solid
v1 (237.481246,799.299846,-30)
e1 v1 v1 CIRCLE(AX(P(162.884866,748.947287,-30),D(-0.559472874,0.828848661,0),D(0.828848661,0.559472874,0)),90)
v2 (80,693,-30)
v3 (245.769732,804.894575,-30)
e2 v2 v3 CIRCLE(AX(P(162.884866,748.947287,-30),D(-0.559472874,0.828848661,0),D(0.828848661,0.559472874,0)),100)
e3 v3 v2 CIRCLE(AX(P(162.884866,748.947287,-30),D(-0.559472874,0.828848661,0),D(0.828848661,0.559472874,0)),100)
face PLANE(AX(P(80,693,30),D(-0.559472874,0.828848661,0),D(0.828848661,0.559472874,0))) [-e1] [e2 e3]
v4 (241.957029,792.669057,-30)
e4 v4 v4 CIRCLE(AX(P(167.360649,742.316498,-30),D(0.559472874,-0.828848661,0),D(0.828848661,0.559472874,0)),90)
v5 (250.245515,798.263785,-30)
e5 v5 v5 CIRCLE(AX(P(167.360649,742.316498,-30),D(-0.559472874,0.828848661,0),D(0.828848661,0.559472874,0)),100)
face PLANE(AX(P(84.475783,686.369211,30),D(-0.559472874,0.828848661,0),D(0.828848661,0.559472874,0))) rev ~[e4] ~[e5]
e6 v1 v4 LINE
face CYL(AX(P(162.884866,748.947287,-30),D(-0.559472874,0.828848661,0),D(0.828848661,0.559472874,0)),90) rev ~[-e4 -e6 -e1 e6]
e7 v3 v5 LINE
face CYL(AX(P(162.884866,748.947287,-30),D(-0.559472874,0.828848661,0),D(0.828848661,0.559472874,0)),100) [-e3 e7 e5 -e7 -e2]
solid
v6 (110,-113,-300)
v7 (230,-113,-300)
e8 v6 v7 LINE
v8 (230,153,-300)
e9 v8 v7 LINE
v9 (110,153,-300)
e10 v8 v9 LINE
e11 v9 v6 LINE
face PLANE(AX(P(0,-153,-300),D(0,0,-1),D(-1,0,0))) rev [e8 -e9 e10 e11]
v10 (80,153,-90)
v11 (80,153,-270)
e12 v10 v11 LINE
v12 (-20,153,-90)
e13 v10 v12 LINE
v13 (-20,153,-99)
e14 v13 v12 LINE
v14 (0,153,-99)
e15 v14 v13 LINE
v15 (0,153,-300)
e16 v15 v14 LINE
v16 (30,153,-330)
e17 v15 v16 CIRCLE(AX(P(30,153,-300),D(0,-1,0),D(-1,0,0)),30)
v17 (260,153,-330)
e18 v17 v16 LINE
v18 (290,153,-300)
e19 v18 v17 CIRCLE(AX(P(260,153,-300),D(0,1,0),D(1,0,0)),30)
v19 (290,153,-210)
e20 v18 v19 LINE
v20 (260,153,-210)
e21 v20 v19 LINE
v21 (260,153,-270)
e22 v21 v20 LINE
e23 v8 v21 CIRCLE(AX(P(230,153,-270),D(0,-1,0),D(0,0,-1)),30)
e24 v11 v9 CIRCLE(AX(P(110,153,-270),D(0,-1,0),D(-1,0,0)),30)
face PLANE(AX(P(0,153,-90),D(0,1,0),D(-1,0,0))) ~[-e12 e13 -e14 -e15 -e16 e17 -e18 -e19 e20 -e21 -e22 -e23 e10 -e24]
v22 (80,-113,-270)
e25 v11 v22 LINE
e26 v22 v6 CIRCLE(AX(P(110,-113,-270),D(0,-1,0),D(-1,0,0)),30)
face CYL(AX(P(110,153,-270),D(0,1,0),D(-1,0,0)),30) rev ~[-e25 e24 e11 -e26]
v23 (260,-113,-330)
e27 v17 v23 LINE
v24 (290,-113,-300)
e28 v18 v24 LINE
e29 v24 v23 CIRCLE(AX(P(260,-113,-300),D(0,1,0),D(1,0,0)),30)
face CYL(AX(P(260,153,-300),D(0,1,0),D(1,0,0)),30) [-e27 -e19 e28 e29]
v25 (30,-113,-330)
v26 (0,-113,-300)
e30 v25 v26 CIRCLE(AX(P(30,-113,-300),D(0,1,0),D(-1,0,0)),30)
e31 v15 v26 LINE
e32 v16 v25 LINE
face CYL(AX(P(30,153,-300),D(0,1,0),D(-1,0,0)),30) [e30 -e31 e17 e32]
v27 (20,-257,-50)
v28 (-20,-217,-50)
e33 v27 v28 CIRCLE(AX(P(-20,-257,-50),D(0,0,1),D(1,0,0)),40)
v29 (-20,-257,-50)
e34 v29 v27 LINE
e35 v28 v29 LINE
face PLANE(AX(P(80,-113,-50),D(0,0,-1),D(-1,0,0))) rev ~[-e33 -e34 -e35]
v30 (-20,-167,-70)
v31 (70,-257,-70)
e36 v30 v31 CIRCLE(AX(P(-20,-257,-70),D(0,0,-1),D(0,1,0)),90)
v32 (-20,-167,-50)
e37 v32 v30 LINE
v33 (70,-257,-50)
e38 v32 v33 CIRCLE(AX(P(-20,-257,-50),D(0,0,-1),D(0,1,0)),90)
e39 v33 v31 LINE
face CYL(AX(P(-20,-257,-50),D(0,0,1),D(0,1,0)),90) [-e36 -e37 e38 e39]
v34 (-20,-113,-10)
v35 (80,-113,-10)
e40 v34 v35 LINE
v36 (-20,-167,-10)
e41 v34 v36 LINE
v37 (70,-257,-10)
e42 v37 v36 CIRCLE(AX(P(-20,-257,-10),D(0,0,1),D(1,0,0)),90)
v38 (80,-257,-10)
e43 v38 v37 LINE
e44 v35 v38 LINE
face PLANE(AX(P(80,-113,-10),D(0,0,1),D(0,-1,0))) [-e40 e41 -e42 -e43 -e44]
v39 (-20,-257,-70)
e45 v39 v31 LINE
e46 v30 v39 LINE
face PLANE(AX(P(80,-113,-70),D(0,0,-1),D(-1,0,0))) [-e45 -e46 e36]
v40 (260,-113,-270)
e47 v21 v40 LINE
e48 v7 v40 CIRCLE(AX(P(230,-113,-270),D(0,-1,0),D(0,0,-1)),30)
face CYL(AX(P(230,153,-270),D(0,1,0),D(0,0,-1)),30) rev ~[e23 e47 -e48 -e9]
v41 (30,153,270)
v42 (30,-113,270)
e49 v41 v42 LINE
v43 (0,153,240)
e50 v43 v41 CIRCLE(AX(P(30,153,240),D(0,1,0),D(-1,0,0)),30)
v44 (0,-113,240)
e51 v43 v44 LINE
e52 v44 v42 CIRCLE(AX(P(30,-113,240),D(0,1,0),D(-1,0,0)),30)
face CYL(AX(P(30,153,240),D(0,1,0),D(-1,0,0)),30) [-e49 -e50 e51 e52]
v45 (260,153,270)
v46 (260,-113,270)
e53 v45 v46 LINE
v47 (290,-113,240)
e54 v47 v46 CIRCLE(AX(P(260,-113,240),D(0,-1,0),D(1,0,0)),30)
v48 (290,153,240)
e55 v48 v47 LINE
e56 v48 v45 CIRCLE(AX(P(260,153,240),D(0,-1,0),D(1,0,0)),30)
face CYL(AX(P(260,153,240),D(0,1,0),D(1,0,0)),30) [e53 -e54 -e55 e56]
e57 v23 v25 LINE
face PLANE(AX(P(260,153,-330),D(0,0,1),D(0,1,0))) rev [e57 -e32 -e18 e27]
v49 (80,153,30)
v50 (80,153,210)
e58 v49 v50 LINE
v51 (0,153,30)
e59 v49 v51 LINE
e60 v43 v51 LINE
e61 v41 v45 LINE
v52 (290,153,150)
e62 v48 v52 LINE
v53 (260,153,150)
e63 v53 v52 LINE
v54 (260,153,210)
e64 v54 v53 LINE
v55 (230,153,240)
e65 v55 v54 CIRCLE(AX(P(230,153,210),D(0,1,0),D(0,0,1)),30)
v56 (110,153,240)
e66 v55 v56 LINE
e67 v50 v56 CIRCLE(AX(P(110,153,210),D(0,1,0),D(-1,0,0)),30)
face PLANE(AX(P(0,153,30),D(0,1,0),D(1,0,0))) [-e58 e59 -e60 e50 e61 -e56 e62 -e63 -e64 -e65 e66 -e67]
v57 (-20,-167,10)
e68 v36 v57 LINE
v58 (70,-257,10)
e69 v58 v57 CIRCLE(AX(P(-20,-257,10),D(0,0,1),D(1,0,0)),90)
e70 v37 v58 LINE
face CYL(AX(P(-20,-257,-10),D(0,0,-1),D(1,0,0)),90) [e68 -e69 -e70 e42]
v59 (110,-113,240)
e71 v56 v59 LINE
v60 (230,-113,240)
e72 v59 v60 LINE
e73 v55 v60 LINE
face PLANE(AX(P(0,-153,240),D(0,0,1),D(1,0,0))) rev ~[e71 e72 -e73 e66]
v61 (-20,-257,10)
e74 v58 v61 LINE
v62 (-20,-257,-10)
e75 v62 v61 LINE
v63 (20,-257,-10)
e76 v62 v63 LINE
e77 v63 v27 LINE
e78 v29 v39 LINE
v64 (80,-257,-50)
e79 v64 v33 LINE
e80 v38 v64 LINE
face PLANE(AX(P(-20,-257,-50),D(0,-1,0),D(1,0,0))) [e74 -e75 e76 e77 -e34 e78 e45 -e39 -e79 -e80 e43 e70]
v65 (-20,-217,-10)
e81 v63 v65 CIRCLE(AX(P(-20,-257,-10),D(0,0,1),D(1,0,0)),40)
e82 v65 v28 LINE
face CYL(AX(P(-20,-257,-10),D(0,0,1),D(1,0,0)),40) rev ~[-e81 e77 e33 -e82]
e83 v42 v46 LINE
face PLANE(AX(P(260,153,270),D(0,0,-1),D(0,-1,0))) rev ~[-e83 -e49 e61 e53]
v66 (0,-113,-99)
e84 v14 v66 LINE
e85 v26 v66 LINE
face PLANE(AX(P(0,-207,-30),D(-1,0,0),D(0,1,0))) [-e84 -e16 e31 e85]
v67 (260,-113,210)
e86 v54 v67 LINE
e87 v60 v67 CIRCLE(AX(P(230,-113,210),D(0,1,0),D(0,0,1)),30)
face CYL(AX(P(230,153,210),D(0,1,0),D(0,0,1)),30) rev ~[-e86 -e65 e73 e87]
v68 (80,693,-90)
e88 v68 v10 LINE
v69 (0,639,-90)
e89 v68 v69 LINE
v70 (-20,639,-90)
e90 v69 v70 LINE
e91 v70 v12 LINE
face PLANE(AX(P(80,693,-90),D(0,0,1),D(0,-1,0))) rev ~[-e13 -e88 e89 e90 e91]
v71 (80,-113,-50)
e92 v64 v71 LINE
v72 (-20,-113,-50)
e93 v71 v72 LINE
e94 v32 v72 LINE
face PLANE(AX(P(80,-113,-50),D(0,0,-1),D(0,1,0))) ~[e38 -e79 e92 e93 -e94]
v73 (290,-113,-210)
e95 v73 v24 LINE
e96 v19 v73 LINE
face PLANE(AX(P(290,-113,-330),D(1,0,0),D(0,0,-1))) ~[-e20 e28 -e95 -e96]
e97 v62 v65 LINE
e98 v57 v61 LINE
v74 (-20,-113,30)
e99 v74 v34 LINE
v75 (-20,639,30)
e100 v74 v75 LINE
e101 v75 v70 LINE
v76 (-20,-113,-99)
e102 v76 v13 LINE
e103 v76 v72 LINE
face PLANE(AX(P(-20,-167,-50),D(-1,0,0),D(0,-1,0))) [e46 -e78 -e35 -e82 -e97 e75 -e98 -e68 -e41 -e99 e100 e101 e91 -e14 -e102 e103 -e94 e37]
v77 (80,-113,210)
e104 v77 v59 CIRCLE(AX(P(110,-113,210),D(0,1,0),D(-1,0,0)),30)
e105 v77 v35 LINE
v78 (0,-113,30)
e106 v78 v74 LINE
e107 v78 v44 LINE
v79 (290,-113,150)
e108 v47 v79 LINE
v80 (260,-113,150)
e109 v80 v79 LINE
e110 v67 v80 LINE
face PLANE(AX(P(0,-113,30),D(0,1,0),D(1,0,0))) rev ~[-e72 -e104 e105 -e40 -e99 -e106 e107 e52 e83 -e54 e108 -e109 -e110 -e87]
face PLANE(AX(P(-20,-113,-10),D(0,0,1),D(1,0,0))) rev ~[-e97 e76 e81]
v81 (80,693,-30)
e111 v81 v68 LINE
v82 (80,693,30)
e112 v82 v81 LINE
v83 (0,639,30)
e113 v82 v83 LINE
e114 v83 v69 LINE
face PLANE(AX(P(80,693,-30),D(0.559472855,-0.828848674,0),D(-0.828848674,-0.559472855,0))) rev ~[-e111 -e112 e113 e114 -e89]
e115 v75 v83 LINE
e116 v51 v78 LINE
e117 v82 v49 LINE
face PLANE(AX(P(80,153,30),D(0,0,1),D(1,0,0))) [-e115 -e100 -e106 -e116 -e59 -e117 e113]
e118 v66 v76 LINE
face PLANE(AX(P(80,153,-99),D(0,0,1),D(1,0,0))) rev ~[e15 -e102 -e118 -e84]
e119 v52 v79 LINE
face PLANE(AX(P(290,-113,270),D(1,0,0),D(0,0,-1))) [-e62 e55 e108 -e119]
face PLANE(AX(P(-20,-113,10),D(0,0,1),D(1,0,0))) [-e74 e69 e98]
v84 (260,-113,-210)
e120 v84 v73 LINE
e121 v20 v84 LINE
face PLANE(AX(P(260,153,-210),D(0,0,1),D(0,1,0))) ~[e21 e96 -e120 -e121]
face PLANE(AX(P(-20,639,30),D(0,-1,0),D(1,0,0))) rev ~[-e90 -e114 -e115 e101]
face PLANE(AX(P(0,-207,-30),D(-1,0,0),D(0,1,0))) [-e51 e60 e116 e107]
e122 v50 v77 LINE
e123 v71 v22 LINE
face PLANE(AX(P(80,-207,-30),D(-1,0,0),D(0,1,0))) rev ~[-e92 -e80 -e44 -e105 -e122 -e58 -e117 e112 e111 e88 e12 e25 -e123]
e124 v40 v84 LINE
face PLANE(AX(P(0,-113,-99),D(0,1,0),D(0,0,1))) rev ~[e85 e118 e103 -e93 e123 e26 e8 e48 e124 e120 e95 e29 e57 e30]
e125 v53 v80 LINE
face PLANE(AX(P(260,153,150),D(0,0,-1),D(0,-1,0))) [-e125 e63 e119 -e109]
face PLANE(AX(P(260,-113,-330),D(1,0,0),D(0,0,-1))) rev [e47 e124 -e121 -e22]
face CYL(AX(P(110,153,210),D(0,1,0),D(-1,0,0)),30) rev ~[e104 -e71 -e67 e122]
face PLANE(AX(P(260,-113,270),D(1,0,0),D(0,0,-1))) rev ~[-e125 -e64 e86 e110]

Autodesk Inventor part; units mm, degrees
ref_plane "YZ Plane" through (0, 0, 0) normal (1, 0, 0) x (0, 1, 0)
ref_plane "XZ Plane" through (0, 0, 0) normal (0, 1, 0) x (-1, 0, 0)
ref_plane "XY Plane" through (0, 0, 0) normal (0, 0, 1) x (1, 0, 0)
sketch "Sketch1" plane through (0, 0, 0) normal (0, 0, 1) x (1, 0, 0)
  line L0 (0, -27) -> (0, 396)
  line L1 (0, -27) -> (40, -27)
  line L2 (40, -27) -> (40, 423)
  line L3 (40, 423) -> (0, 396)
  point P0 (0, 0)
  dimension "d0" = 423
  dimension "d1" = 27
  dimension "d2" = 40
  dimension "d3" = 450
extrude "Extrusion1" add sketch "Sketch1" along normal mid plane 300
sketch "Sketch2" plane through (40, -27, 150) normal (1, 0, 0) x (0, 0, -1)
  line L0 (0, 450) -> (300, 450) construction
  line L1 (150, 450) -> (150, 0) construction
  line L2 (300, 0) -> (0, 0) construction
  line L3 (120, 450) -> (120, 180)
  line L4 (120, 180) -> (0, 180)
  line L5 (0, 180) -> (0, 450)
  line L6 (0, 423) -> (0, 0) projected
  line L7 (300, 450) -> (0, 450) construction
  line L8 (180, 450) -> (180, 180)
  line L9 (180, 180) -> (300, 180)
  line L10 (300, 180) -> (300, 450)
  line L11 (0, 0) -> (0, 450) projected
  line L12 (0, 450) -> (120, 450)
  line L13 (180, 450) -> (300, 450)
  point P0 (150, 27)
  dimension "d6" = 270
extrude "Extrusion2" cut sketch "Sketch2" against normal blind 263.525
sketch "Sketch3" plane through (0, 0, 150) normal (0, 0, 1) x (1, 0, 0)
  line L0 (40, -27) -> (0, -27) projected
  arc A0 (27, -27) -> (0, 0) centre (0, -27) ccw
  line L1 (0, -27) -> (0, 153) projected
  line L2 (0, 0) -> (0, -27)
  line L3 (0, -27) -> (27, -27)
  dimension "d9" = 27
extrude "Extrusion3" cut sketch "Sketch3" against normal blind 400
sketch "Sketch4" plane through (40, -27, 150) normal (1, 0, 0) x (0, 0, -1)
  line L0 (0, 0) -> (300, 0) projected
  line L1 (0, 0) -> (120, 0)
  line L2 (120, 0) -> (120, 27)
  line L3 (300, 27) -> (0, 27) projected
  line L4 (120, 27) -> (0, 27)
  line L5 (0, 0) -> (0, 180) projected
  line L6 (0, 27) -> (0, 0)
  point P0 (150, 27)
  dimension "d12" = 120
  dimension "d13" = 27
extrude "Extrusion4" cut sketch "Sketch4" against normal blind 400
mirror "Mirror1" about plane through (0, 0, 0) normal (0, 0, 1) of "Extrusion4"
sketch "Sketch5" plane through (40, 153, 150) normal (0, 1, 0) x (1, 0, 0)
  point P0 (-40, 150)
sketch "Sketch6" plane through (40, 423, 30) normal (-0.5594729, 0.8288487, 0) x (0.8288487, 0.5594729, 0)
  line L0 (0, 0) -> (0, 60) projected
  line L1 (0, 30) -> (50, 30)
  circle A0 centre (50, 30) radius 50
  circle A1 centre (50, 30) radius 45
  point P0 (-269.811, 30)
  dimension "d16" = 50
  dimension "d17" = 90
extrude "Extrusion5" add sketch "Sketch6" against normal blind 4
sketch "Sketch7" plane through (40, 153, -30) normal (1, 0, 0) x (0, 0, -1)
  line L0 (-60, -153) -> (-60, -180) projected
  line L1 (-60, -153) -> (-60, -133)
  line L2 (-60, -133) -> (-180, -133)
  line L3 (-180, -153) -> (-180, 0) projected
  line L4 (-180, -153) -> (-60, -153) projected
  line L5 (-180, -153) -> (-60, -153)
  point P0 (-30, -153)
  dimension "d20" = 20
extrude "Extrusion6" cut sketch "Sketch7" against normal blind 300
mirror "Mirror2" about plane through (0, 0, 0) normal (0, 0, 1) of "Extrusion6"
sketch "Sketch8" plane through (0, 0, 150) normal (0, 0, 1) x (1, 0, 0)
  point P0 (0, 0)
sketch "Sketch9" plane through (0, 0, 150) normal (0, 0, 1) x (1, 0, 0)
  point P0 (0, 0)
sketch "Sketch10" plane through (0, 0, 150) normal (0, 0, 1) x (1, 0, 0)
  point P0 (0, 0)
sketch "Sketch11" plane through (0, 0, 150) normal (0, 0, 1) x (1, 0, 0)
  line L0 (40, 153) -> (0, 153) projected
  line L1 (40, 20) -> (40, -27) projected
  line L2 (40, 153) -> (40, 20)
  line L3 (40, 20) -> (130, 20)
  line L4 (130, 20) -> (130, 153)
  line L5 (130, 153) -> (40, 153)
  point P0 (0, 0)
  dimension "d23" = 90
extrude "Extrusion7" add sketch "Sketch11" against normal blind 15
mirror "Mirror3" about plane through (0, 0, 0) normal (0, 0, 1) of "Extrusion7"
sketch "Sketch12" plane through (130, 20, 150) normal (1, 0, 0) x (0, 0, -1)
  line L0 (0, 133) -> (0, 0) projected
  line L1 (0, 133) -> (60, 133)
  line L2 (0, 133) -> (120, 133) projected
  line L3 (60, 133) -> (60, 0)
  line L4 (15, 0) -> (120, 0) projected
  line L5 (60, 0) -> (0, 0)
  line L6 (0, 0) -> (0, 133)
  point P0 (150, -20)
extrude "Extrusion8" add sketch "Sketch12" along normal blind 15
mirror "Mirror4" about plane through (0, 0, 0) normal (0, 0, 1) of "Extrusion8"
sketch "Sketch13" plane through (40, 153, -30) normal (1, 0, 0) x (0, 0, -1)
  line L0 (-60, -153) -> (-60, -133) projected
  line L1 (-60, -133) -> (-40, -133)
  line L2 (-40, -133) -> (-40, -180)
  line L3 (-60, -180) -> (0, -180) projected
  line L4 (-40, -180) -> (-60, -180)
  line L5 (-60, -180) -> (-60, -133)
  point P0 (-30, -153)
  dimension "d28" = 20
extrude "Extrusion9" cut sketch "Sketch13" against normal blind 200
mirror "Mirror5" about plane through (0, 0, 0) normal (0, 0, 1) of "Extrusion9"
sketch "Sketch14" plane through (0, 153, 30) normal (0, 1, 0) x (1, 0, 0)
  line L0 (0, -120) -> (0, 0) projected
  line L1 (0, 0) -> (0, -105)
  line L2 (145, -120) -> (0, -120) projected
  line L3 (15, -120) -> (145, -120)
  arc A0 (0, -105) -> (15, -120) centre (15, -105) ccw
  line L4 (0, 0) -> (0, -120)
  line L5 (0, -120) -> (145, -120)
  arc A1 (0, -105) -> (15, -120) centre (15, -105) ccw
  line L6 (0, -105) -> (0, -120)
  line L7 (0, -120) -> (15, -120)
  arc A2 (0, -105) -> (15, -120) centre (15, -105) ccw
  point P0 (0, 30)
  dimension "d31" = 15
extrude "Extrusion10" cut sketch "Sketch14" against normal blind 200
sketch "Sketch15" plane through (0, 153, 30) normal (0, 1, 0) x (1, 0, 0)
  line L0 (40, 0) -> (40, -105) projected
  line L1 (40, 0) -> (40, -90)
  line L2 (40, -105) -> (130, -105) projected
  line L3 (55, -105) -> (130, -105)
  arc A0 (40, -90) -> (55, -105) centre (55, -90) ccw
  arc A1 (40, -90) -> (55, -105) centre (55, -90) ccw
  line L4 (40, -90) -> (40, -105)
  line L5 (40, -105) -> (55, -105)
  point P0 (0, 30)
  dimension "d34" = 15
sketch "Sketch16" plane through (0, 0, 150) normal (0, 0, 1) x (1, 0, 0)
  point P0 (0, 0)
extrude "Extrusion11" add sketch "Sketch15" against normal blind 133
mirror "Mirror6" about plane through (0, 0, 0) normal (0, 0, 1) of "Extrusion11", "Extrusion10"
sketch "Sketch17" plane through (0, 153, 30) normal (0, 1, 0) x (1, 0, 0)
  line L0 (130, -60) -> (130, -105) projected
  line L1 (130, -60) -> (130, -90)
  line L2 (55, -105) -> (130, -105) projected
  line L3 (115, -105) -> (55, -105)
  arc A0 (115, -105) -> (130, -90) centre (115, -90) ccw
  arc A1 (115, -105) -> (130, -90) centre (115, -90) ccw
  line L4 (130, -90) -> (130, -105)
  line L5 (130, -105) -> (115, -105)
  point P0 (0, 30)
  dimension "d37" = 15
extrude "Extrusion12" add sketch "Sketch17" against normal blind 133
mirror "Mirror7" about plane through (0, 0, 0) normal (0, 0, 1) of "Extrusion12"
sketch "Sketch18" plane through (0, 153, -30) normal (0, 1, 0) x (1, 0, 0)
  line L0 (15, 120) -> (145, 120) projected
  line L1 (15, 120) -> (130, 120)
  line L2 (145, 120) -> (145, 60) projected
  line L3 (145, 105) -> (145, 60)
  arc A0 (145, 105) -> (130, 120) centre (130, 105) ccw
  arc A1 (145, 105) -> (130, 120) centre (130, 105) ccw
  line L4 (130, 120) -> (145, 120)
  line L5 (145, 120) -> (145, 105)
  point P0 (0, -30)
  dimension "d40" = 15
extrude "Extrusion13" cut sketch "Sketch18" against normal blind 133
mirror "Mirror8" about plane through (0, 0, 0) normal (0, 0, 1) of "Extrusion13"
scale "Scale1" factors (2, 2, 2) then translate (0, -153, -30) bodies 1
sketch "Sketch19" plane through (80, 153, 30) normal (0, 0, 1) x (1, 0, 0)
  point P0 (-80, -153)
sketch "Sketch20" plane through (80, -207, -10) normal (0, 0, 1) x (1, 0, 0)
  point P0 (-80, 207)
sketch "Sketch21" plane through (80, -207, -10) normal (0, 0, 1) x (1, 0, 0)
  point P0 (-80, 207)
sketch "Sketch22" plane through (80, 153, 30) normal (0, 0, 1) x (1, 0, 0)
  line L0 (0, 540) -> (-80, 486) projected
  line L1 (-80, 486) -> (-80, -360)
  line L2 (-80, -360) -> (-100, -360)
  line L3 (-100, -360) -> (-100, 486)
  line L4 (-100, 486) -> (-80, 486)
  point P0 (-80, -153)
  dimension "d46" = 846
  dimension "d47" = 20
sketch "Sketch23" plane through (0, 153, 30) normal (-1, 0, 0) x (0, 0, 1)
  point P0 (-30, -153)
extrude "Extrusion14" add sketch "Sketch22" against normal blind 129
sketch "Sketch24" plane through (0, -207, 30) normal (1, 0, 0) x (0, 0, -1)
  line L0 (40, 94) -> (40, 0) projected
  line L1 (40, 94) -> (40, 0)
  line L2 (0, 0) -> (0, 846) projected
  line L3 (40, 0) -> (0, 0)
  line L4 (0, 0) -> (0, 94)
  line L5 (0, 94) -> (40, 94)
  line L6 (40, 0) -> (0, 0)
  point P0 (30, 207)
extrude "Extrusion15" cut sketch "Sketch24" against normal blind 129
sketch "Sketch25" plane through (0, -207, -99) normal (1, 0, 0) x (0, 0, -1)
  line L0 (0, 94) -> (-49, 94) projected
  line L1 (-49, 94) -> (0, 94)
  line L2 (0, 0) -> (0, 846) projected
  line L3 (0, 94) -> (0, 0)
  line L4 (0, 0) -> (-44.5, 0)
  line L5 (-89, 0) -> (0, 0) projected
  line L6 (-49, 0) -> (-49, 54) projected
  line L7 (-49, 0) -> (-49, 94)
  point P0 (-99, 207)
extrude "Extrusion16" cut sketch "Sketch25" against normal blind 129
sketch "Sketch26" plane through (80, -207, -10) normal (0, 0, 1) x (1, 0, 0)
  line L0 (-100, 0) -> (-100, 94) projected
  line L1 (-26, 0) -> (0, 0) projected
  arc A0 (-26, 0) -> (-100, 74) centre (-100, 0) ccw
  line L2 (-100, 0) -> (-26, 0)
  line L3 (-100, 0) -> (-100, 74)
  line L4 (0, 94) -> (-100, 94) projected
  point P0 (-80, 207)
extrude "Extrusion17" cut sketch "Sketch26" against normal blind 129
sketch "Sketch27" plane through (0, 153, -90) normal (1, 0, 0) x (0, 0, -1)
  line L0 (-120, 486) -> (9, 486) projected
  line L1 (9, 486) -> (9, 0)
  line L2 (9, -266) -> (9, 486) projected
  line L3 (0, 486) -> (0, 0) projected
  line L4 (9, 0) -> (0, 0)
  line L5 (0, 0) -> (0, 486)
  line L6 (0, 486) -> (9, 486)
  point P0 (-90, -153)
extrude "Extrusion18" cut sketch "Sketch27" against normal blind 129
sketch "Sketch28" plane through (80, -207, -10) normal (0, 0, 1) x (1, 0, 0)
  line L0 (0, 0) -> (-26, 0) projected
  arc A0 (-10, 0) -> (-100, 90) centre (-100, 0) ccw
  line L1 (-10, 0) -> (-100, 0)
  line L2 (-100, 0) -> (-100, 90)
  point P0 (-80, 207)
  dimension "d58" = 90
sketch "Sketch29" plane through (-20, -113, 30) normal (-1, 0, 0) x (0, 0, 1)
  point P0 (-30, 113)
sketch "Sketch30" plane through (80, -207, -10) normal (0, 0, 1) x (1, 0, 0)
  line L0 (-100, 74) -> (-100, 94) projected
  line L1 (-100, 74) -> (0, 74)
  line L2 (0, 94) -> (0, 0) projected
  line L3 (0, 74) -> (0, 0)
  line L4 (0, 0) -> (0, -50)
  line L5 (0, -50) -> (-100, -50)
  line L6 (-100, -50) -> (-100, 74)
  point P0 (-80, 207)
  dimension "d59" = 50
extrude "Extrusion19" add sketch "Sketch30" against normal blind 40
sketch "Sketch31" plane through (-20, -113, -10) normal (0, 0, 1) x (1, 0, 0)
  line L0 (100, -144) -> (0, -144) projected
  arc A0 (40, -144) -> (0, -104) centre (0, -144) ccw
  line L1 (0, -144) -> (0, 0) projected
  line L2 (0, -144) -> (40, -144)
  line L3 (0, -144) -> (0, -104)
  point P0 (20, 113)
  dimension "d62" = 40
extrude "Extrusion20" cut sketch "Sketch31" against normal blind 40
sketch "Sketch32" plane through (-20, -113, -10) normal (0, 0, 1) x (1, 0, 0)
  line L0 (100, -144) -> (40, -144) projected
  arc A0 (90, -144) -> (0, -54) centre (0, -144) ccw
  line L1 (0, -144) -> (90, -144)
  line L2 (0, -144) -> (0, -54)
  line L3 (0, -104) -> (0, 0) projected
  point P0 (20, 113)
  dimension "d65" = 90
extrude "Extrusion21" add sketch "Sketch32" along normal blind 20
sketch "Sketch33" plane through (80, -113, -50) normal (0, 0, -1) x (-1, 0, 0)
  line L0 (100, -144) -> (10, -144) projected
  arc A0 (100, -54) -> (10, -144) centre (100, -144) ccw projected
  arc A1 (100, -54) -> (10, -144) centre (100, -144) ccw
  line L1 (100, -54) -> (100, -144)
  line L2 (100, -144) -> (10, -144)
  point P0 (80, 113)
  dimension "d68" = 90
extrude "Extrusion22" add sketch "Sketch33" along normal blind 20
sketch "Sketch34" plane through (0, 153, 30) normal (0, 1, 0) x (1, 0, 0)
  point P0 (0, 30)
sketch "Sketch35" plane through (260, 153, -210) normal (0, 1, 0) x (1, 0, 0)
  point P0 (-260, -210)
properties part number "TRUNK_1" material "Rubber, Silicone"
